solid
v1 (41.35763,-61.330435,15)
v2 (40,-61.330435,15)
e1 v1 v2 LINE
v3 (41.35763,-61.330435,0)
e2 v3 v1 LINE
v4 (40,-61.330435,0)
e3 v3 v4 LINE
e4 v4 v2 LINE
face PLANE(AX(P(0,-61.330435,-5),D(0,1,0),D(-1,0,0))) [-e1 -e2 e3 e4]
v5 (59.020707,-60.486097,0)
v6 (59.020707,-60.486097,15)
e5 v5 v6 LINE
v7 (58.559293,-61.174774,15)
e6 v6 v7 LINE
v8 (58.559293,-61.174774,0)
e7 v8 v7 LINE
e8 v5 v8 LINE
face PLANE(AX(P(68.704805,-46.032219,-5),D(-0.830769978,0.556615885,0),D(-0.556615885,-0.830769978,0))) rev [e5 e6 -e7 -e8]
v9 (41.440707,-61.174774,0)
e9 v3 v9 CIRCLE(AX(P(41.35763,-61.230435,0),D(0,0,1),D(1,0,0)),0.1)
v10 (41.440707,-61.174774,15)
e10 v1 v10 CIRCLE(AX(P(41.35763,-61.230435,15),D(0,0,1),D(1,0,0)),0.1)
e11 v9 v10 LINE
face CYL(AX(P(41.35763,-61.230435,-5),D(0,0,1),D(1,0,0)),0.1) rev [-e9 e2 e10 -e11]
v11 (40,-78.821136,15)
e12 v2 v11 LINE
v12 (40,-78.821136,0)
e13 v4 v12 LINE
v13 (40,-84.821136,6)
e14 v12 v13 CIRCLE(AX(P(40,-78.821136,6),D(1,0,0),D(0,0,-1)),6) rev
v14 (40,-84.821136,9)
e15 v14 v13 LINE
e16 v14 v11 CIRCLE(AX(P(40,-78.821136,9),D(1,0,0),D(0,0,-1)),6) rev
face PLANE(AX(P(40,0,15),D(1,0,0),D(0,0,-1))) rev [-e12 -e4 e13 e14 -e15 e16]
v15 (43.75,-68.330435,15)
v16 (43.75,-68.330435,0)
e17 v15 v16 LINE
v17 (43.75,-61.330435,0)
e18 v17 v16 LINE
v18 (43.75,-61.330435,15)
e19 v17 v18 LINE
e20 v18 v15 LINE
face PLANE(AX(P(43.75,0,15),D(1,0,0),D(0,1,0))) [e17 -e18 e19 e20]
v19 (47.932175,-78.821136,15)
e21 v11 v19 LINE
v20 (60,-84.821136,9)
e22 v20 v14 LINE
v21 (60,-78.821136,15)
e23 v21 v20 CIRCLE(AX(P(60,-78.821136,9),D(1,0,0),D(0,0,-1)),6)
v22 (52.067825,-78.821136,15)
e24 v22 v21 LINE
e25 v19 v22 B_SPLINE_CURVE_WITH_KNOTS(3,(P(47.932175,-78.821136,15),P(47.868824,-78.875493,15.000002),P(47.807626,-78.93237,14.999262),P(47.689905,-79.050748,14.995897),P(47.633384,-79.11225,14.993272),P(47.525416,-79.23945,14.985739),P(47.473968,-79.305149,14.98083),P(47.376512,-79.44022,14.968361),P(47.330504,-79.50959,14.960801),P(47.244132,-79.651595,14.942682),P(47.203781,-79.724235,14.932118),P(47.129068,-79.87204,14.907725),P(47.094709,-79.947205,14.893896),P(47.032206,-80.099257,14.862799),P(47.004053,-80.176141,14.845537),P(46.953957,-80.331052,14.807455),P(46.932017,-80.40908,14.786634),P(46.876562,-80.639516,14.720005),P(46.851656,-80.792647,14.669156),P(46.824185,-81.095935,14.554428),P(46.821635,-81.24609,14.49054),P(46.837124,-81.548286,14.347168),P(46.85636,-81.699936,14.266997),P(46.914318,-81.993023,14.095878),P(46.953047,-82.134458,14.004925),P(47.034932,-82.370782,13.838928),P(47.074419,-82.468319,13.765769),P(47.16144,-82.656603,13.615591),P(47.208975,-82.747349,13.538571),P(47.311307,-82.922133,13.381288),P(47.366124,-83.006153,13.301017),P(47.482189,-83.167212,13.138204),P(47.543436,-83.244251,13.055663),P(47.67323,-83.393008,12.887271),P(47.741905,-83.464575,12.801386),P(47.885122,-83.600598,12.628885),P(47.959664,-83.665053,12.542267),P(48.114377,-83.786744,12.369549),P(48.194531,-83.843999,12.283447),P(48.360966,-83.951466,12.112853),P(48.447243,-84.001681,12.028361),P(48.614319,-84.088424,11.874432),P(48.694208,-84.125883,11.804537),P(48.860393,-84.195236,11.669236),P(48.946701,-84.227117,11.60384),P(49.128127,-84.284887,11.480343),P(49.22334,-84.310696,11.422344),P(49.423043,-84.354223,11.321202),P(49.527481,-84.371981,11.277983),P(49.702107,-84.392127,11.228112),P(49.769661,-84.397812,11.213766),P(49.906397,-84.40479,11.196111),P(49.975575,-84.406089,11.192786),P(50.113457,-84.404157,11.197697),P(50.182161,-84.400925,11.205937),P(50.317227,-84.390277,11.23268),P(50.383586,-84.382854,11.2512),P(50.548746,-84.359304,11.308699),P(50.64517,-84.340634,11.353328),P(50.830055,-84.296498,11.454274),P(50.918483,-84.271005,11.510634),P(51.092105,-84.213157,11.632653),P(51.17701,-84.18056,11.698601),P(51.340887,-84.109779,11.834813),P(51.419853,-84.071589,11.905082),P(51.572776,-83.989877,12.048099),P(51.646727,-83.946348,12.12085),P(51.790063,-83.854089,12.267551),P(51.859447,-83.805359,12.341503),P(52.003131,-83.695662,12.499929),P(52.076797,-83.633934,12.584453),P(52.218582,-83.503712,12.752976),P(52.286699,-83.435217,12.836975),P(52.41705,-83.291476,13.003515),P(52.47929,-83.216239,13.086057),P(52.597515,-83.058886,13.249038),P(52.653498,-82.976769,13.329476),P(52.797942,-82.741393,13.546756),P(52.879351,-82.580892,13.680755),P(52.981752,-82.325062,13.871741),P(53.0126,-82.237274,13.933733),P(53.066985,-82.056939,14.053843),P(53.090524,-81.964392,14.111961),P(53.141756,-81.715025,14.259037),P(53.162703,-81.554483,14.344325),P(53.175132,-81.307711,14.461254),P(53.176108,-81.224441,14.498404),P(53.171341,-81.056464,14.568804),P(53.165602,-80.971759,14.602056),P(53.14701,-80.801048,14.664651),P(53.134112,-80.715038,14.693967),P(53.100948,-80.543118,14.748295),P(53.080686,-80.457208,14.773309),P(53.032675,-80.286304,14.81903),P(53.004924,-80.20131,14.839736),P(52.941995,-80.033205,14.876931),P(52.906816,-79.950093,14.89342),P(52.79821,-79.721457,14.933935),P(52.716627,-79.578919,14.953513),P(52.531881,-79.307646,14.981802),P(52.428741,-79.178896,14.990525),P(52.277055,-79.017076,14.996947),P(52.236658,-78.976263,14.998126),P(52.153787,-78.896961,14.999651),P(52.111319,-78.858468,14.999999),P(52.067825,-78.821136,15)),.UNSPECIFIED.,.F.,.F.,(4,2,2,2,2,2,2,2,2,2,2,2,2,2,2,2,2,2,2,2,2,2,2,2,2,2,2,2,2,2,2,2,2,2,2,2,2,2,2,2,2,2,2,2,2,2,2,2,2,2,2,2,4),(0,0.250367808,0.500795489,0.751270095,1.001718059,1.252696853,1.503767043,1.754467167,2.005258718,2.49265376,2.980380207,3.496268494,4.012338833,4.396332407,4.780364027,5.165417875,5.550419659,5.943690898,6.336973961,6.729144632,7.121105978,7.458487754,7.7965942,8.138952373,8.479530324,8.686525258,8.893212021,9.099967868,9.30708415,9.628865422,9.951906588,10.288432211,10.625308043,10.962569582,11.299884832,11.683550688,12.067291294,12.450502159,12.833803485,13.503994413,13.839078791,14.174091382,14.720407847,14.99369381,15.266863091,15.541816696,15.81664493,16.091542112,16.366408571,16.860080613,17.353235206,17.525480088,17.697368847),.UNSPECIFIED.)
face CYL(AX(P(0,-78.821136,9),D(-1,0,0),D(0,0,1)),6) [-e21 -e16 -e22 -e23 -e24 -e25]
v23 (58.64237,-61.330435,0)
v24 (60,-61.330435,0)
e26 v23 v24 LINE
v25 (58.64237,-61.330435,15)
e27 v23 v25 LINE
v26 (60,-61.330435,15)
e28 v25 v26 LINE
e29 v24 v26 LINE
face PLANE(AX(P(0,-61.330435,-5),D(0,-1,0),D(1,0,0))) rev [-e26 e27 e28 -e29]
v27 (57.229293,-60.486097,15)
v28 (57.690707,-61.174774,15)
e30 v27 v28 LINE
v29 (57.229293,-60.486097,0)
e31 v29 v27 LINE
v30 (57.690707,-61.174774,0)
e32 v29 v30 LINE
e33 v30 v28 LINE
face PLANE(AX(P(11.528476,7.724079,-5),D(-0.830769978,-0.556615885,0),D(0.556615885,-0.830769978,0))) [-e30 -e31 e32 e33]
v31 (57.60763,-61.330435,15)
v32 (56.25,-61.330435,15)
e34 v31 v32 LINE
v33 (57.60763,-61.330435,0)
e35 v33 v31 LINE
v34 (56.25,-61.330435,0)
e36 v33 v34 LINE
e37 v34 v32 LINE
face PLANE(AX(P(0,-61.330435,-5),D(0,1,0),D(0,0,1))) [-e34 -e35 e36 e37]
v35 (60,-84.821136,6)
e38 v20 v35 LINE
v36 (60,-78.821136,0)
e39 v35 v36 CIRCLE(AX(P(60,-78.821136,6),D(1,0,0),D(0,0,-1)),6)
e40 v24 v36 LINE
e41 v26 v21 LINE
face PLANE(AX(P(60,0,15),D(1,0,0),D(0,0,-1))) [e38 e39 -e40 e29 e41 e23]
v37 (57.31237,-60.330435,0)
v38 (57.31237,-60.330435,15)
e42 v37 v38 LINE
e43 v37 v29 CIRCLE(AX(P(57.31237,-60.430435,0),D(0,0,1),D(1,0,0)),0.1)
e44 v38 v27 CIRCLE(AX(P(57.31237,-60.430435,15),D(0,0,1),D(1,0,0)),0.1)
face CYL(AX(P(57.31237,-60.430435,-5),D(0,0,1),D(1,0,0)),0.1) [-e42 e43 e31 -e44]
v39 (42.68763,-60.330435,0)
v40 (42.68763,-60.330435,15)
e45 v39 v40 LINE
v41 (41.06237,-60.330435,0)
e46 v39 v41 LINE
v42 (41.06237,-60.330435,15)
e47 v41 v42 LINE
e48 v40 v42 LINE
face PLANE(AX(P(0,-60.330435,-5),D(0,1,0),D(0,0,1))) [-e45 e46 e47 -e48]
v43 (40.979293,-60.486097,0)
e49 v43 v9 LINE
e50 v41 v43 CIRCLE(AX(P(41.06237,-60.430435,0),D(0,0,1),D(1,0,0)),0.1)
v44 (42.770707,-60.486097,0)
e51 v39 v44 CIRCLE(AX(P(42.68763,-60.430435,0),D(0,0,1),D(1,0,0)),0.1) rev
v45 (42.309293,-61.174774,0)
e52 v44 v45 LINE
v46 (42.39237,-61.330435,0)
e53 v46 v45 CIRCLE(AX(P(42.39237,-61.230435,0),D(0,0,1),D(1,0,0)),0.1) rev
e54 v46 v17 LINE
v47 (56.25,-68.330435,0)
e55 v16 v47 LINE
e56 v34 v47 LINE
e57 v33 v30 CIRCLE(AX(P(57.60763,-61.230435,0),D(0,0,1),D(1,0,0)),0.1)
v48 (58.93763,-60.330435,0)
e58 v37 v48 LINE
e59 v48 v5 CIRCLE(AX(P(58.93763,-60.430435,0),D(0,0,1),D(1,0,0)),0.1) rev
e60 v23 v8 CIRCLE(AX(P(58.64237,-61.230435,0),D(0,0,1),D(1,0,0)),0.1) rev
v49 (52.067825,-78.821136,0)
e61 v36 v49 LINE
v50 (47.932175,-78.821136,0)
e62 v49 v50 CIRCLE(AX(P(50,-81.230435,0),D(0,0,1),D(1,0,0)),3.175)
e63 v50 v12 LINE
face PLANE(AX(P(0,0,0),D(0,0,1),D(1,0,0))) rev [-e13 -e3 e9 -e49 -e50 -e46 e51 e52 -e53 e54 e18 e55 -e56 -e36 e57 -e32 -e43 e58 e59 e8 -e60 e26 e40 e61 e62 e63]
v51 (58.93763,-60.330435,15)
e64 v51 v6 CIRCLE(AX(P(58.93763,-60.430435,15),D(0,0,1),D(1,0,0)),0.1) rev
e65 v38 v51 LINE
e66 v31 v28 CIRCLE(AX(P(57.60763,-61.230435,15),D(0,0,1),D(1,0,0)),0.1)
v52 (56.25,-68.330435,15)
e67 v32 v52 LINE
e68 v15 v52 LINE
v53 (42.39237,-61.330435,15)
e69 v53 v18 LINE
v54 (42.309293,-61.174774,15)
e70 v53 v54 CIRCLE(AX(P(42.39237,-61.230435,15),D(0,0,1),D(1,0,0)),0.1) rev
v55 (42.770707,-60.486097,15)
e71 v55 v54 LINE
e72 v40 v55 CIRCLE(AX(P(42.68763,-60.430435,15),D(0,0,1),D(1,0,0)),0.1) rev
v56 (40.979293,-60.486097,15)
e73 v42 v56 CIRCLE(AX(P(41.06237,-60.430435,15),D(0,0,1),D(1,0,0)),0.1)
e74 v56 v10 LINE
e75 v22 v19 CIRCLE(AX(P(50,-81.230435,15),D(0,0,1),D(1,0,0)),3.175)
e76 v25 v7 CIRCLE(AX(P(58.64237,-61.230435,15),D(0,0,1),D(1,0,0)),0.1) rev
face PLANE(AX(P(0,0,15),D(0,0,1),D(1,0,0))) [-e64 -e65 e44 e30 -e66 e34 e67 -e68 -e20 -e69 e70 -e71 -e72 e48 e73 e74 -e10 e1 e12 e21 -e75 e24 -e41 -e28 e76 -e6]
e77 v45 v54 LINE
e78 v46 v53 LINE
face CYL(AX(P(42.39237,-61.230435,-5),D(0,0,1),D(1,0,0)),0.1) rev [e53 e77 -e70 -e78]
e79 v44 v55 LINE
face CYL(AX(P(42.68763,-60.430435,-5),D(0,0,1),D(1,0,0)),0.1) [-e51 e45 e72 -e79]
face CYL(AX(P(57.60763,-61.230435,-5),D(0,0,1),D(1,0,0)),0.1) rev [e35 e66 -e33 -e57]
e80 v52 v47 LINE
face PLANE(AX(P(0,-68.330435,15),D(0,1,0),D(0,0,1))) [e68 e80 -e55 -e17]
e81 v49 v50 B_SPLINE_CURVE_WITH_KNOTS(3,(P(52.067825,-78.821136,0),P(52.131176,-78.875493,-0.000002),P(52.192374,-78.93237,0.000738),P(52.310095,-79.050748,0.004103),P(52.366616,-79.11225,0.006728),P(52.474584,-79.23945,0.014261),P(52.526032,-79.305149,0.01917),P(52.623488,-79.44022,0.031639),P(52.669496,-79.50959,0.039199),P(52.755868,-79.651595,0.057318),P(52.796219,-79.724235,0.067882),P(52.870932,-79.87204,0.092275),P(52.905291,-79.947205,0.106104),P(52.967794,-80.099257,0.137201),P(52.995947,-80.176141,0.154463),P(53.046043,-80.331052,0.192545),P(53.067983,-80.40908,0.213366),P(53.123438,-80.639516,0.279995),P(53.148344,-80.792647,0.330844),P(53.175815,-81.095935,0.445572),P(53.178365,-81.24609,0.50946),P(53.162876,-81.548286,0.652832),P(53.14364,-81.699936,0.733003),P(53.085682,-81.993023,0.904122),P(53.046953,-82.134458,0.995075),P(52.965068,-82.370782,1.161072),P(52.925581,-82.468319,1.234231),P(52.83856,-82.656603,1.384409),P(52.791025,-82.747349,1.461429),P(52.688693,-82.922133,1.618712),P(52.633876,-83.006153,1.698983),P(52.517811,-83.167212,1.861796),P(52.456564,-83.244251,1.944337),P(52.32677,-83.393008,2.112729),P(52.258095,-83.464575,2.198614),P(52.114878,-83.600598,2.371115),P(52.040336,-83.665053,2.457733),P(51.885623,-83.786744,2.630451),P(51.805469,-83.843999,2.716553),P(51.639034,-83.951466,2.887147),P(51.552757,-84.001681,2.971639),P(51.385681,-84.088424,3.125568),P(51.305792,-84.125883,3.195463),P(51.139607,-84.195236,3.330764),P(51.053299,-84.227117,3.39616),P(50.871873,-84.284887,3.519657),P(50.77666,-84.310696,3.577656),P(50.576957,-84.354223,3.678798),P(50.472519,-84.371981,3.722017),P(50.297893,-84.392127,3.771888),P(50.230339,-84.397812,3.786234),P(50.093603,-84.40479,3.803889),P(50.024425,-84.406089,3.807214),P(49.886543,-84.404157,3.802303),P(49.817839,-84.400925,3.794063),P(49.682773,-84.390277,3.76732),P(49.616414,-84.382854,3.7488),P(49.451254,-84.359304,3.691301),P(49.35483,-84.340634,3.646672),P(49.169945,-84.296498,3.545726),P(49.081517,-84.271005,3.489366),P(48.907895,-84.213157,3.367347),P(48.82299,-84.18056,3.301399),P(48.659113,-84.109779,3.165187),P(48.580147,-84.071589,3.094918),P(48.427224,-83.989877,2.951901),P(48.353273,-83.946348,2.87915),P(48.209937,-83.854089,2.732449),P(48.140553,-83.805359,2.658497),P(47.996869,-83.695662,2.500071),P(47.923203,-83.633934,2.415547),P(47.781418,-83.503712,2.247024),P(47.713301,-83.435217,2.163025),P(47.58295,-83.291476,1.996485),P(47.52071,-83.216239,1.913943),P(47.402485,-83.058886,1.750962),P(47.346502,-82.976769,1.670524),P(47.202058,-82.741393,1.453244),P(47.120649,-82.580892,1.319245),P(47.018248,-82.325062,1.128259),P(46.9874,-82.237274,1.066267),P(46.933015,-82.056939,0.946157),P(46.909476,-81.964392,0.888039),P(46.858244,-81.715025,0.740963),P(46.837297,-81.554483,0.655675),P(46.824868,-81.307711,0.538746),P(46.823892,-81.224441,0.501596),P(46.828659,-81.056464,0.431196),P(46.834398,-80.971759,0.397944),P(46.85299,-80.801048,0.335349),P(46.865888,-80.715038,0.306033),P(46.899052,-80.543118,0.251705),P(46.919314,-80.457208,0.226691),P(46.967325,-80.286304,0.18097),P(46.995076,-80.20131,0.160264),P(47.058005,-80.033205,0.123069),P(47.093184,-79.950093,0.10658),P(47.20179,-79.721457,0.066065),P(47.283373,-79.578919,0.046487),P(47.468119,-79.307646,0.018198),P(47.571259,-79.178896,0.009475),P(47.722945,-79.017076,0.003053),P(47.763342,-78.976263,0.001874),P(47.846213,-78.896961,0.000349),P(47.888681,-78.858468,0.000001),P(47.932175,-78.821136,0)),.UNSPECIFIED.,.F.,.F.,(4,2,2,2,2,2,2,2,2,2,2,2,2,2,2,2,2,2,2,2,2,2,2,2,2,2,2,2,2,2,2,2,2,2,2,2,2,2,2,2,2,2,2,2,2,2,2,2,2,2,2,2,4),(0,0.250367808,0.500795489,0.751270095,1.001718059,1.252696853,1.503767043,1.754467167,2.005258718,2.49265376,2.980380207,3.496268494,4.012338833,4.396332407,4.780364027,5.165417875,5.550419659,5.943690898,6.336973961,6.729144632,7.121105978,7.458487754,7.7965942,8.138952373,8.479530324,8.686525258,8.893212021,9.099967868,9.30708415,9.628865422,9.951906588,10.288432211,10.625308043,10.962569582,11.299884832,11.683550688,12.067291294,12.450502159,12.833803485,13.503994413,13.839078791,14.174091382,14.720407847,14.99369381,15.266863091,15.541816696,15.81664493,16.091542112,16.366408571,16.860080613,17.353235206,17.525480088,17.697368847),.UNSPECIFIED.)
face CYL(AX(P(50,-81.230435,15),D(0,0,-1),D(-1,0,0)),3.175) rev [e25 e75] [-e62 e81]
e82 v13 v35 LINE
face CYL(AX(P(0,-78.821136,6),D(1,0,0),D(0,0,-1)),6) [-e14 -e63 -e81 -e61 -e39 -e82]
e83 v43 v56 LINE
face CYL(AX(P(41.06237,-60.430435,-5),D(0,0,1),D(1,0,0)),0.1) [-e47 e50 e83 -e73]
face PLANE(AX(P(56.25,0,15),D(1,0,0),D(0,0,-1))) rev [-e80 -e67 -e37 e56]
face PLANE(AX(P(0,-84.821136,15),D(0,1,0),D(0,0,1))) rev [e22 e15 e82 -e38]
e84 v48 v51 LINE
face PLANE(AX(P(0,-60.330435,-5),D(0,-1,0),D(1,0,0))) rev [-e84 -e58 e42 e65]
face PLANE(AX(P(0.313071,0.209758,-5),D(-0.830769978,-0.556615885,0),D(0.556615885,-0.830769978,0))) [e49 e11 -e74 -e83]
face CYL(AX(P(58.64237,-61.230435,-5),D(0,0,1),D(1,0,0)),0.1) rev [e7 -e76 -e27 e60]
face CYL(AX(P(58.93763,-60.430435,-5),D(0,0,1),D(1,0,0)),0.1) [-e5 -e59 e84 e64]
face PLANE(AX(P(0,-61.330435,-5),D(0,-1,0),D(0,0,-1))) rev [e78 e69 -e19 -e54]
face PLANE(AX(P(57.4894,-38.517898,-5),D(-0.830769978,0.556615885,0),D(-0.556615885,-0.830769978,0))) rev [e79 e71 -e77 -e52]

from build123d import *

# Parameters (mm, degrees)
SKETCH1_R           = 3.175
SKETCH1_W           = 12.5
SKETCH1_H           = 14
BOSS_EXTRUDE1_DEPTH = 15
SKETCH3_R           = 1.95
CUT_EXTRUDE2_DEPTH  = 7.5
BOSS_EXTRUDE2_DEPTH = 3.75
FILLET1_R           = 6
FILLET2_R           = 6
FILLET3_R           = 5
FILLET4_R           = 7.5
FILLET5_R           = 6
FILLET6_R           = 6
CUT_EXTRUDE4_DEPTH  = 20
SKETCH2_R           = 2.5
CUT_EXTRUDE1_DEPTH  = 10


with BuildPart() as part:
    # Sketch1 → Boss-Extrude1 (new body)
    with BuildSketch(Plane.XY):
        Polygon((60, -37.839734641), (55, -37.839734641), (45, -37.839734641), (40, -37.839734641), (40, -84.821135581), (60, -84.821135581), align=None)
        with Locations((50, -81.230435111)):
            Circle(SKETCH1_R, mode=Mode.SUBTRACT)
        with Locations((50, -61.330435111)):
            Rectangle(SKETCH1_W, SKETCH1_H, mode=Mode.SUBTRACT)
        with Locations((50, -41.430435111)):
            Circle(SKETCH1_R, mode=Mode.SUBTRACT)
    extrude(amount=BOSS_EXTRUDE1_DEPTH)

    # Sketch3 → Cut-Extrude2 (cut)
    with BuildSketch(Plane.XZ.offset(54.330435111)):
        with Locations(Location((50, 10, 0), (0, 0, 270))):
            Circle(SKETCH3_R)
    extrude(amount=-CUT_EXTRUDE2_DEPTH, mode=Mode.SUBTRACT)

    # Sketch6 → Boss-Extrude2 (add, symmetric)
    with BuildSketch(Plane.XY.offset(7.5)):
        Polygon((-46.25, -23.832633625), (46.25, -23.832633625), (53.75, -23.832633625), (53.75, -13.832633625), (-46.25, -13.832633625), align=None)
        Polygon((53.75, -23.832633625), (46.25, -23.832633625), (46.25, -37.839734641), (50, -37.839734641), (53.75, -37.839734641), align=None)
    extrude(amount=BOSS_EXTRUDE2_DEPTH, both=True)

    # Fillet1
    # the kernel refuses this fillet: 6 mm, written as the material it takes off along each edge
    with BuildSketch(Plane(origin=(75, -37.839734641, 0), x_dir=(0, 0, 1), z_dir=(-1, 0, 0))) as fillet1_piece_1_section:
        with BuildLine():
            CenterArc((FILLET1_R, -FILLET1_R), FILLET1_R, 90, 90)
            Line((0, -FILLET1_R), (0, 0))
            Line((0, 0), (FILLET1_R, 0))
        make_face()
    fillet1_piece_1 = extrude(amount=50, mode=Mode.PRIVATE)
    fillet1_piece_1 = split(fillet1_piece_1, bisect_by=Plane(origin=(53.75, -37.839734641, 0), z_dir=(1, 0, 0)), keep=Keep.TOP, mode=Mode.PRIVATE)
    fillet1_piece_1 = split(fillet1_piece_1, bisect_by=Plane(origin=(75, -37.839734641, 3.75), z_dir=(0, 0, 1)), keep=Keep.TOP, mode=Mode.PRIVATE)
    add(fillet1_piece_1, mode=Mode.SUBTRACT)
    with BuildSketch(Plane(origin=(75, -37.839734641, 0), x_dir=(0, 0, 1), z_dir=(-1, 0, 0))) as fillet1_piece_2_section:
        with BuildLine():
            CenterArc((FILLET1_R, -FILLET1_R), FILLET1_R, 90, 90)
            Line((0, -FILLET1_R), (0, 0))
            Line((0, 0), (FILLET1_R, 0))
        make_face()
    fillet1_piece_2 = extrude(amount=50, mode=Mode.PRIVATE)
    fillet1_piece_2 = split(fillet1_piece_2, bisect_by=Plane(origin=(53.75, -37.839734641, 0), z_dir=(1, 0, 0)), keep=Keep.TOP, mode=Mode.PRIVATE)
    fillet1_piece_2 = split(fillet1_piece_2, bisect_by=Plane(origin=(75, -37.839734641, 3.75), z_dir=(0, 0, -1)), keep=Keep.TOP, mode=Mode.PRIVATE)
    add(fillet1_piece_2, mode=Mode.SUBTRACT)
    with BuildSketch(Plane(origin=(75, -37.839734641, 0), x_dir=(0, 0, 1), z_dir=(-1, 0, 0))) as fillet1_piece_3_section:
        with BuildLine():
            CenterArc((FILLET1_R, -FILLET1_R), FILLET1_R, 90, 90)
            Line((0, -FILLET1_R), (0, 0))
            Line((0, 0), (FILLET1_R, 0))
        make_face()
    fillet1_piece_3 = extrude(amount=50, mode=Mode.PRIVATE)
    fillet1_piece_3 = split(fillet1_piece_3, bisect_by=Plane(origin=(53.75, -37.839734641, 0), z_dir=(-1, 0, 0)), keep=Keep.TOP, mode=Mode.PRIVATE)
    fillet1_piece_3 = split(fillet1_piece_3, bisect_by=Plane(origin=(46.25, -37.839734641, 0), z_dir=(1, 0, 0)), keep=Keep.TOP, mode=Mode.PRIVATE)
    fillet1_piece_3 = split(fillet1_piece_3, bisect_by=Plane(origin=(75, -37.839734641, 3.75), z_dir=(0, 0, -1)), keep=Keep.TOP, mode=Mode.PRIVATE)
    add(fillet1_piece_3, mode=Mode.SUBTRACT)
    with BuildSketch(Plane(origin=(75, -37.839734641, 0), x_dir=(0, 0, 1), z_dir=(-1, 0, 0))) as fillet1_piece_4_section:
        with BuildLine():
            CenterArc((FILLET1_R, -FILLET1_R), FILLET1_R, 90, 90)
            Line((0, -FILLET1_R), (0, 0))
            Line((0, 0), (FILLET1_R, 0))
        make_face()
    fillet1_piece_4 = extrude(amount=50, mode=Mode.PRIVATE)
    fillet1_piece_4 = split(fillet1_piece_4, bisect_by=Plane(origin=(46.25, -37.839734641, 0), z_dir=(-1, 0, 0)), keep=Keep.TOP, mode=Mode.PRIVATE)
    fillet1_piece_4 = split(fillet1_piece_4, bisect_by=Plane(origin=(75, -37.839734641, 3.75), z_dir=(0, 0, 1)), keep=Keep.TOP, mode=Mode.PRIVATE)
    add(fillet1_piece_4, mode=Mode.SUBTRACT)
    with BuildSketch(Plane(origin=(75, -37.839734641, 0), x_dir=(0, 0, 1), z_dir=(-1, 0, 0))) as fillet1_piece_5_section:
        with BuildLine():
            CenterArc((FILLET1_R, -FILLET1_R), FILLET1_R, 90, 90)
            Line((0, -FILLET1_R), (0, 0))
            Line((0, 0), (FILLET1_R, 0))
        make_face()
    fillet1_piece_5 = extrude(amount=50, mode=Mode.PRIVATE)
    fillet1_piece_5 = split(fillet1_piece_5, bisect_by=Plane(origin=(46.25, -37.839734641, 0), z_dir=(-1, 0, 0)), keep=Keep.TOP, mode=Mode.PRIVATE)
    fillet1_piece_5 = split(fillet1_piece_5, bisect_by=Plane(origin=(75, -37.839734641, 3.75), z_dir=(0, 0, -1)), keep=Keep.TOP, mode=Mode.PRIVATE)
    add(fillet1_piece_5, mode=Mode.SUBTRACT)
    with BuildSketch(Plane(origin=(25, -37.839734641, 15), x_dir=(0, 0, -1), z_dir=(1, 0, 0))) as fillet1_piece_6_section:
        with BuildLine():
            CenterArc((FILLET1_R, -FILLET1_R), FILLET1_R, 90, 90)
            Line((0, -FILLET1_R), (0, 0))
            Line((0, 0), (FILLET1_R, 0))
        make_face()
    fillet1_piece_6 = extrude(amount=50, mode=Mode.PRIVATE)
    fillet1_piece_6 = split(fillet1_piece_6, bisect_by=Plane(origin=(25, -37.839734641, 11.25), z_dir=(0, 0, -1)), keep=Keep.TOP, mode=Mode.PRIVATE)
    fillet1_piece_6 = split(fillet1_piece_6, bisect_by=Plane(origin=(46.25, -37.839734641, 15), z_dir=(-1, 0, 0)), keep=Keep.TOP, mode=Mode.PRIVATE)
    add(fillet1_piece_6, mode=Mode.SUBTRACT)
    with BuildSketch(Plane(origin=(25, -37.839734641, 15), x_dir=(0, 0, -1), z_dir=(1, 0, 0))) as fillet1_piece_7_section:
        with BuildLine():
            CenterArc((FILLET1_R, -FILLET1_R), FILLET1_R, 90, 90)
            Line((0, -FILLET1_R), (0, 0))
            Line((0, 0), (FILLET1_R, 0))
        make_face()
    fillet1_piece_7 = extrude(amount=50, mode=Mode.PRIVATE)
    fillet1_piece_7 = split(fillet1_piece_7, bisect_by=Plane(origin=(25, -37.839734641, 11.25), z_dir=(0, 0, 1)), keep=Keep.TOP, mode=Mode.PRIVATE)
    fillet1_piece_7 = split(fillet1_piece_7, bisect_by=Plane(origin=(46.25, -37.839734641, 15), z_dir=(-1, 0, 0)), keep=Keep.TOP, mode=Mode.PRIVATE)
    add(fillet1_piece_7, mode=Mode.SUBTRACT)
    with BuildSketch(Plane(origin=(25, -37.839734641, 15), x_dir=(0, 0, -1), z_dir=(1, 0, 0))) as fillet1_piece_8_section:
        with BuildLine():
            CenterArc((FILLET1_R, -FILLET1_R), FILLET1_R, 90, 90)
            Line((0, -FILLET1_R), (0, 0))
            Line((0, 0), (FILLET1_R, 0))
        make_face()
    fillet1_piece_8 = extrude(amount=50, mode=Mode.PRIVATE)
    fillet1_piece_8 = split(fillet1_piece_8, bisect_by=Plane(origin=(53.75, -37.839734641, 15), z_dir=(-1, 0, 0)), keep=Keep.TOP, mode=Mode.PRIVATE)
    fillet1_piece_8 = split(fillet1_piece_8, bisect_by=Plane(origin=(25, -37.839734641, 11.25), z_dir=(0, 0, 1)), keep=Keep.TOP, mode=Mode.PRIVATE)
    fillet1_piece_8 = split(fillet1_piece_8, bisect_by=Plane(origin=(46.25, -37.839734641, 15), z_dir=(1, 0, 0)), keep=Keep.TOP, mode=Mode.PRIVATE)
    add(fillet1_piece_8, mode=Mode.SUBTRACT)
    with BuildSketch(Plane(origin=(25, -37.839734641, 15), x_dir=(0, 0, -1), z_dir=(1, 0, 0))) as fillet1_piece_9_section:
        with BuildLine():
            CenterArc((FILLET1_R, -FILLET1_R), FILLET1_R, 90, 90)
            Line((0, -FILLET1_R), (0, 0))
            Line((0, 0), (FILLET1_R, 0))
        make_face()
    fillet1_piece_9 = extrude(amount=50, mode=Mode.PRIVATE)
    fillet1_piece_9 = split(fillet1_piece_9, bisect_by=Plane(origin=(53.75, -37.839734641, 15), z_dir=(1, 0, 0)), keep=Keep.TOP, mode=Mode.PRIVATE)
    fillet1_piece_9 = split(fillet1_piece_9, bisect_by=Plane(origin=(25, -37.839734641, 11.25), z_dir=(0, 0, -1)), keep=Keep.TOP, mode=Mode.PRIVATE)
    add(fillet1_piece_9, mode=Mode.SUBTRACT)
    with BuildSketch(Plane(origin=(25, -37.839734641, 15), x_dir=(0, 0, -1), z_dir=(1, 0, 0))) as fillet1_piece_10_section:
        with BuildLine():
            CenterArc((FILLET1_R, -FILLET1_R), FILLET1_R, 90, 90)
            Line((0, -FILLET1_R), (0, 0))
            Line((0, 0), (FILLET1_R, 0))
        make_face()
    fillet1_piece_10 = extrude(amount=50, mode=Mode.PRIVATE)
    fillet1_piece_10 = split(fillet1_piece_10, bisect_by=Plane(origin=(53.75, -37.839734641, 15), z_dir=(1, 0, 0)), keep=Keep.TOP, mode=Mode.PRIVATE)
    fillet1_piece_10 = split(fillet1_piece_10, bisect_by=Plane(origin=(25, -37.839734641, 11.25), z_dir=(0, 0, 1)), keep=Keep.TOP, mode=Mode.PRIVATE)
    add(fillet1_piece_10, mode=Mode.SUBTRACT)

    # Fillet2
    # the kernel refuses this fillet: 6 mm, written as the material it takes off along each edge
    with BuildSketch(Plane(origin=(25, -84.821135581, 0), x_dir=(0, 1, 0), z_dir=(1, 0, 0))) as fillet2_piece_1:
        with BuildLine():
            CenterArc((FILLET2_R, FILLET2_R), FILLET2_R, 180, 90)
            Line((0, FILLET2_R), (0, 0))
            Line((0, 0), (FILLET2_R, 0))
        make_face()
    extrude(amount=50, mode=Mode.SUBTRACT)
    with BuildSketch(Plane(origin=(25, -84.821135581, 15), x_dir=(0, 1, 0), z_dir=(1, 0, 0))) as fillet2_piece_2:
        with BuildLine():
            CenterArc((FILLET2_R, -FILLET2_R), FILLET2_R, 90, 90)
            Line((0, -FILLET2_R), (0, 0))
            Line((0, 0), (FILLET2_R, 0))
        make_face()
    extrude(amount=50, mode=Mode.SUBTRACT)

    # Fillet3
    fillet3_edges = [part.edges().sort_by_distance(p)[0] for p in [
        (3.75, -13.832633625, 3.75),
    ]]
    fillet(fillet3_edges, radius=FILLET3_R)

    # Fillet4
    # the kernel refuses this fillet: 7.5 mm, written as the material it takes off along each edge
    with BuildSketch(Plane(origin=(-63.92766953, -23.832633625, 3.75), x_dir=(0, 1, 0), z_dir=(1, 0, 0))) as fillet4_piece_1:
        with BuildLine():
            CenterArc((7.5, 7.071067812), FILLET4_R, 180, 70.528779366)
            Line((0, 7.071067812), (0, 0))
            Line((0, 0), (5, 0))
        make_face()
    extrude(amount=110.17766953, mode=Mode.SUBTRACT)

    # Fillet5
    # the kernel refuses this fillet: 6 mm, written as the material it adds along each edge
    with BuildSketch(Plane(origin=(53.75, -38.277585776, 11.25), x_dir=(0, 1, 0), z_dir=(-1, 0, 0))) as fillet5_piece_1_section:
        with BuildLine():
            CenterArc((3.152063664, -6), FILLET5_R, 90, 46.567463442)
            ThreePointArc((-1.205042601, -1.875), (-0.514692889, -0.993946388), (0, 0))
            Line((0, 0), (3.152063664, 0))
        make_face()
    fillet5_piece_1 = extrude(amount=11.255771566, mode=Mode.PRIVATE)
    fillet5_piece_1 = fillet5_piece_1 - Plane(origin=(50, -41.430435111, 11.25), x_dir=(1, 0, 0), z_dir=(0, 0, -1)) * Cylinder(3.175, 36, mode=Mode.PRIVATE)
    fillet5_piece_1 = split(fillet5_piece_1, bisect_by=Plane(origin=(46.25, -38.277585776, 11.25), z_dir=(1, 0, 0)), keep=Keep.TOP, mode=Mode.PRIVATE)
    add(fillet5_piece_1)
    with BuildSketch(Plane(origin=(57.505771566, -38.277585776, 11.25), x_dir=(0, -0.5406577313138206, 0.8412426627142685), z_dir=(-1, 0, 0))) as fillet5_piece_2_section:
        with BuildLine():
            CenterArc((3.343268387, 5.895596817), FILLET5_R, 212.728424697, 46.567463442)
            Line((-1.704187589, 2.651650429), (0, 0))
            ThreePointArc((0, 0), (1.114422796, 0.104403183), (2.228845591, 0))
        make_face()
    fillet5_piece_2 = extrude(amount=11.255771566, mode=Mode.PRIVATE)
    fillet5_piece_2 = fillet5_piece_2 - Plane(origin=(50, -41.430435111, 11.25), x_dir=(1, 0, 0), z_dir=(0, 0, -1)) * Cylinder(3.175, 34, mode=Mode.PRIVATE)
    fillet5_piece_2 = split(fillet5_piece_2, bisect_by=Plane(origin=(53.75, -38.277585776, 11.25), z_dir=(-1, 0, 0)), keep=Keep.TOP, mode=Mode.PRIVATE)
    add(fillet5_piece_2)

    # Fillet6
    # the kernel refuses this fillet: 6 mm, written as the material it adds along each edge
    with BuildSketch(Plane(origin=(46.25, -38.277585776, 3.75), x_dir=(0, 1, 0), z_dir=(1, 0, 0))) as fillet6_piece_1_section:
        with BuildLine():
            CenterArc((3.152063664, -6), FILLET6_R, 90, 46.567463442)
            ThreePointArc((-1.205042601, -1.875), (-0.514692889, -0.993946388), (0, 0))
            Line((0, 0), (3.152063664, 0))
        make_face()
    fillet6_piece_1 = extrude(amount=11.255771566, mode=Mode.PRIVATE)
    fillet6_piece_1 = split(fillet6_piece_1, bisect_by=Plane(origin=(53.75, -38.277585776, 3.75), z_dir=(-1, 0, 0)), keep=Keep.TOP, mode=Mode.PRIVATE)
    fillet6_piece_1 = fillet6_piece_1 - Plane(origin=(50, -41.430435111, 3.75), x_dir=(1, 0, 0), z_dir=(0, 0, -1)) * Cylinder(3.175, 36, mode=Mode.PRIVATE)
    add(fillet6_piece_1)
    with BuildSketch(Plane(origin=(42.494228434, -38.277585776, 3.75), x_dir=(0, 1, 0), z_dir=(1, 0, 0))) as fillet6_piece_2_section:
        with BuildLine():
            CenterArc((3.152063664, -6), FILLET6_R, 90, 46.567463442)
            ThreePointArc((-1.205042601, -1.875), (-0.514692889, -0.993946388), (0, 0))
            Line((0, 0), (3.152063664, 0))
        make_face()
    fillet6_piece_2 = extrude(amount=11.255771566, mode=Mode.PRIVATE)
    fillet6_piece_2 = split(fillet6_piece_2, bisect_by=Plane(origin=(46.25, -38.277585776, 3.75), z_dir=(1, 0, 0)), keep=Keep.TOP, mode=Mode.PRIVATE)
    fillet6_piece_2 = fillet6_piece_2 - Plane(origin=(50, -41.430435111, 3.75), x_dir=(1, 0, 0), z_dir=(0, 0, -1)) * Cylinder(3.175, 36, mode=Mode.PRIVATE)
    add(fillet6_piece_2)

    # Sketch7 → Cut-Extrude4 (cut)
    with BuildSketch(Plane.XY.offset(15)):
        with BuildLine():
            Line((42.687629738, -60.330435111), (41.062370262, -60.330435111))
            ThreePointArc((41.062370262, -60.330435111), (40.974148499, -60.383350925), (40.979293264, -60.486096699))
            Line((40.979293264, -60.486096699), (41.440706736, -61.174773522))
            ThreePointArc((41.440706736, -61.174773522), (41.445851501, -61.277519297), (41.357629738, -61.330435111))
            Line((41.357629738, -61.330435111), (-57.000451656, -61.330435111))
            Line((-57.000451656, -61.330435111), (-57.000451656, -7.955917112))
            Line((-57.000451656, -7.955917112), (60, -7.955917112))
            Line((60, -7.955917112), (60, -61.330435111))
            Line((60, -61.330435111), (58.642370262, -61.330435111))
            ThreePointArc((58.642370262, -61.330435111), (58.554148499, -61.277519297), (58.559293264, -61.174773522))
            Line((58.559293264, -61.174773522), (59.020706736, -60.486096699))
            ThreePointArc((59.020706736, -60.486096699), (59.025851501, -60.383350925), (58.937629738, -60.330435111))
            Line((58.937629738, -60.330435111), (57.312370262, -60.330435111))
            ThreePointArc((57.312370262, -60.330435111), (57.224148499, -60.383350925), (57.229293264, -60.486096699))
            Line((57.229293264, -60.486096699), (57.690706736, -61.174773522))
            ThreePointArc((57.690706736, -61.174773522), (57.695851501, -61.277519297), (57.607629738, -61.330435111))
            Line((57.607629738, -61.330435111), (42.392370262, -61.330435111))
            ThreePointArc((42.392370262, -61.330435111), (42.304148499, -61.277519297), (42.309293264, -61.174773522))
            Line((42.309293264, -61.174773522), (42.770706736, -60.486096699))
            ThreePointArc((42.770706736, -60.486096699), (42.775851501, -60.383350925), (42.687629738, -60.330435111))
        make_face()
    extrude(amount=-CUT_EXTRUDE4_DEPTH, mode=Mode.SUBTRACT)

    # Sketch2 → Cut-Extrude1 (cut)
    with BuildSketch(Plane.XZ.offset(40)):
        with Locations((40, 9.937454881)):
            Circle(SKETCH2_R)
    extrude(amount=-CUT_EXTRUDE1_DEPTH, mode=Mode.SUBTRACT)


solid = part.part
